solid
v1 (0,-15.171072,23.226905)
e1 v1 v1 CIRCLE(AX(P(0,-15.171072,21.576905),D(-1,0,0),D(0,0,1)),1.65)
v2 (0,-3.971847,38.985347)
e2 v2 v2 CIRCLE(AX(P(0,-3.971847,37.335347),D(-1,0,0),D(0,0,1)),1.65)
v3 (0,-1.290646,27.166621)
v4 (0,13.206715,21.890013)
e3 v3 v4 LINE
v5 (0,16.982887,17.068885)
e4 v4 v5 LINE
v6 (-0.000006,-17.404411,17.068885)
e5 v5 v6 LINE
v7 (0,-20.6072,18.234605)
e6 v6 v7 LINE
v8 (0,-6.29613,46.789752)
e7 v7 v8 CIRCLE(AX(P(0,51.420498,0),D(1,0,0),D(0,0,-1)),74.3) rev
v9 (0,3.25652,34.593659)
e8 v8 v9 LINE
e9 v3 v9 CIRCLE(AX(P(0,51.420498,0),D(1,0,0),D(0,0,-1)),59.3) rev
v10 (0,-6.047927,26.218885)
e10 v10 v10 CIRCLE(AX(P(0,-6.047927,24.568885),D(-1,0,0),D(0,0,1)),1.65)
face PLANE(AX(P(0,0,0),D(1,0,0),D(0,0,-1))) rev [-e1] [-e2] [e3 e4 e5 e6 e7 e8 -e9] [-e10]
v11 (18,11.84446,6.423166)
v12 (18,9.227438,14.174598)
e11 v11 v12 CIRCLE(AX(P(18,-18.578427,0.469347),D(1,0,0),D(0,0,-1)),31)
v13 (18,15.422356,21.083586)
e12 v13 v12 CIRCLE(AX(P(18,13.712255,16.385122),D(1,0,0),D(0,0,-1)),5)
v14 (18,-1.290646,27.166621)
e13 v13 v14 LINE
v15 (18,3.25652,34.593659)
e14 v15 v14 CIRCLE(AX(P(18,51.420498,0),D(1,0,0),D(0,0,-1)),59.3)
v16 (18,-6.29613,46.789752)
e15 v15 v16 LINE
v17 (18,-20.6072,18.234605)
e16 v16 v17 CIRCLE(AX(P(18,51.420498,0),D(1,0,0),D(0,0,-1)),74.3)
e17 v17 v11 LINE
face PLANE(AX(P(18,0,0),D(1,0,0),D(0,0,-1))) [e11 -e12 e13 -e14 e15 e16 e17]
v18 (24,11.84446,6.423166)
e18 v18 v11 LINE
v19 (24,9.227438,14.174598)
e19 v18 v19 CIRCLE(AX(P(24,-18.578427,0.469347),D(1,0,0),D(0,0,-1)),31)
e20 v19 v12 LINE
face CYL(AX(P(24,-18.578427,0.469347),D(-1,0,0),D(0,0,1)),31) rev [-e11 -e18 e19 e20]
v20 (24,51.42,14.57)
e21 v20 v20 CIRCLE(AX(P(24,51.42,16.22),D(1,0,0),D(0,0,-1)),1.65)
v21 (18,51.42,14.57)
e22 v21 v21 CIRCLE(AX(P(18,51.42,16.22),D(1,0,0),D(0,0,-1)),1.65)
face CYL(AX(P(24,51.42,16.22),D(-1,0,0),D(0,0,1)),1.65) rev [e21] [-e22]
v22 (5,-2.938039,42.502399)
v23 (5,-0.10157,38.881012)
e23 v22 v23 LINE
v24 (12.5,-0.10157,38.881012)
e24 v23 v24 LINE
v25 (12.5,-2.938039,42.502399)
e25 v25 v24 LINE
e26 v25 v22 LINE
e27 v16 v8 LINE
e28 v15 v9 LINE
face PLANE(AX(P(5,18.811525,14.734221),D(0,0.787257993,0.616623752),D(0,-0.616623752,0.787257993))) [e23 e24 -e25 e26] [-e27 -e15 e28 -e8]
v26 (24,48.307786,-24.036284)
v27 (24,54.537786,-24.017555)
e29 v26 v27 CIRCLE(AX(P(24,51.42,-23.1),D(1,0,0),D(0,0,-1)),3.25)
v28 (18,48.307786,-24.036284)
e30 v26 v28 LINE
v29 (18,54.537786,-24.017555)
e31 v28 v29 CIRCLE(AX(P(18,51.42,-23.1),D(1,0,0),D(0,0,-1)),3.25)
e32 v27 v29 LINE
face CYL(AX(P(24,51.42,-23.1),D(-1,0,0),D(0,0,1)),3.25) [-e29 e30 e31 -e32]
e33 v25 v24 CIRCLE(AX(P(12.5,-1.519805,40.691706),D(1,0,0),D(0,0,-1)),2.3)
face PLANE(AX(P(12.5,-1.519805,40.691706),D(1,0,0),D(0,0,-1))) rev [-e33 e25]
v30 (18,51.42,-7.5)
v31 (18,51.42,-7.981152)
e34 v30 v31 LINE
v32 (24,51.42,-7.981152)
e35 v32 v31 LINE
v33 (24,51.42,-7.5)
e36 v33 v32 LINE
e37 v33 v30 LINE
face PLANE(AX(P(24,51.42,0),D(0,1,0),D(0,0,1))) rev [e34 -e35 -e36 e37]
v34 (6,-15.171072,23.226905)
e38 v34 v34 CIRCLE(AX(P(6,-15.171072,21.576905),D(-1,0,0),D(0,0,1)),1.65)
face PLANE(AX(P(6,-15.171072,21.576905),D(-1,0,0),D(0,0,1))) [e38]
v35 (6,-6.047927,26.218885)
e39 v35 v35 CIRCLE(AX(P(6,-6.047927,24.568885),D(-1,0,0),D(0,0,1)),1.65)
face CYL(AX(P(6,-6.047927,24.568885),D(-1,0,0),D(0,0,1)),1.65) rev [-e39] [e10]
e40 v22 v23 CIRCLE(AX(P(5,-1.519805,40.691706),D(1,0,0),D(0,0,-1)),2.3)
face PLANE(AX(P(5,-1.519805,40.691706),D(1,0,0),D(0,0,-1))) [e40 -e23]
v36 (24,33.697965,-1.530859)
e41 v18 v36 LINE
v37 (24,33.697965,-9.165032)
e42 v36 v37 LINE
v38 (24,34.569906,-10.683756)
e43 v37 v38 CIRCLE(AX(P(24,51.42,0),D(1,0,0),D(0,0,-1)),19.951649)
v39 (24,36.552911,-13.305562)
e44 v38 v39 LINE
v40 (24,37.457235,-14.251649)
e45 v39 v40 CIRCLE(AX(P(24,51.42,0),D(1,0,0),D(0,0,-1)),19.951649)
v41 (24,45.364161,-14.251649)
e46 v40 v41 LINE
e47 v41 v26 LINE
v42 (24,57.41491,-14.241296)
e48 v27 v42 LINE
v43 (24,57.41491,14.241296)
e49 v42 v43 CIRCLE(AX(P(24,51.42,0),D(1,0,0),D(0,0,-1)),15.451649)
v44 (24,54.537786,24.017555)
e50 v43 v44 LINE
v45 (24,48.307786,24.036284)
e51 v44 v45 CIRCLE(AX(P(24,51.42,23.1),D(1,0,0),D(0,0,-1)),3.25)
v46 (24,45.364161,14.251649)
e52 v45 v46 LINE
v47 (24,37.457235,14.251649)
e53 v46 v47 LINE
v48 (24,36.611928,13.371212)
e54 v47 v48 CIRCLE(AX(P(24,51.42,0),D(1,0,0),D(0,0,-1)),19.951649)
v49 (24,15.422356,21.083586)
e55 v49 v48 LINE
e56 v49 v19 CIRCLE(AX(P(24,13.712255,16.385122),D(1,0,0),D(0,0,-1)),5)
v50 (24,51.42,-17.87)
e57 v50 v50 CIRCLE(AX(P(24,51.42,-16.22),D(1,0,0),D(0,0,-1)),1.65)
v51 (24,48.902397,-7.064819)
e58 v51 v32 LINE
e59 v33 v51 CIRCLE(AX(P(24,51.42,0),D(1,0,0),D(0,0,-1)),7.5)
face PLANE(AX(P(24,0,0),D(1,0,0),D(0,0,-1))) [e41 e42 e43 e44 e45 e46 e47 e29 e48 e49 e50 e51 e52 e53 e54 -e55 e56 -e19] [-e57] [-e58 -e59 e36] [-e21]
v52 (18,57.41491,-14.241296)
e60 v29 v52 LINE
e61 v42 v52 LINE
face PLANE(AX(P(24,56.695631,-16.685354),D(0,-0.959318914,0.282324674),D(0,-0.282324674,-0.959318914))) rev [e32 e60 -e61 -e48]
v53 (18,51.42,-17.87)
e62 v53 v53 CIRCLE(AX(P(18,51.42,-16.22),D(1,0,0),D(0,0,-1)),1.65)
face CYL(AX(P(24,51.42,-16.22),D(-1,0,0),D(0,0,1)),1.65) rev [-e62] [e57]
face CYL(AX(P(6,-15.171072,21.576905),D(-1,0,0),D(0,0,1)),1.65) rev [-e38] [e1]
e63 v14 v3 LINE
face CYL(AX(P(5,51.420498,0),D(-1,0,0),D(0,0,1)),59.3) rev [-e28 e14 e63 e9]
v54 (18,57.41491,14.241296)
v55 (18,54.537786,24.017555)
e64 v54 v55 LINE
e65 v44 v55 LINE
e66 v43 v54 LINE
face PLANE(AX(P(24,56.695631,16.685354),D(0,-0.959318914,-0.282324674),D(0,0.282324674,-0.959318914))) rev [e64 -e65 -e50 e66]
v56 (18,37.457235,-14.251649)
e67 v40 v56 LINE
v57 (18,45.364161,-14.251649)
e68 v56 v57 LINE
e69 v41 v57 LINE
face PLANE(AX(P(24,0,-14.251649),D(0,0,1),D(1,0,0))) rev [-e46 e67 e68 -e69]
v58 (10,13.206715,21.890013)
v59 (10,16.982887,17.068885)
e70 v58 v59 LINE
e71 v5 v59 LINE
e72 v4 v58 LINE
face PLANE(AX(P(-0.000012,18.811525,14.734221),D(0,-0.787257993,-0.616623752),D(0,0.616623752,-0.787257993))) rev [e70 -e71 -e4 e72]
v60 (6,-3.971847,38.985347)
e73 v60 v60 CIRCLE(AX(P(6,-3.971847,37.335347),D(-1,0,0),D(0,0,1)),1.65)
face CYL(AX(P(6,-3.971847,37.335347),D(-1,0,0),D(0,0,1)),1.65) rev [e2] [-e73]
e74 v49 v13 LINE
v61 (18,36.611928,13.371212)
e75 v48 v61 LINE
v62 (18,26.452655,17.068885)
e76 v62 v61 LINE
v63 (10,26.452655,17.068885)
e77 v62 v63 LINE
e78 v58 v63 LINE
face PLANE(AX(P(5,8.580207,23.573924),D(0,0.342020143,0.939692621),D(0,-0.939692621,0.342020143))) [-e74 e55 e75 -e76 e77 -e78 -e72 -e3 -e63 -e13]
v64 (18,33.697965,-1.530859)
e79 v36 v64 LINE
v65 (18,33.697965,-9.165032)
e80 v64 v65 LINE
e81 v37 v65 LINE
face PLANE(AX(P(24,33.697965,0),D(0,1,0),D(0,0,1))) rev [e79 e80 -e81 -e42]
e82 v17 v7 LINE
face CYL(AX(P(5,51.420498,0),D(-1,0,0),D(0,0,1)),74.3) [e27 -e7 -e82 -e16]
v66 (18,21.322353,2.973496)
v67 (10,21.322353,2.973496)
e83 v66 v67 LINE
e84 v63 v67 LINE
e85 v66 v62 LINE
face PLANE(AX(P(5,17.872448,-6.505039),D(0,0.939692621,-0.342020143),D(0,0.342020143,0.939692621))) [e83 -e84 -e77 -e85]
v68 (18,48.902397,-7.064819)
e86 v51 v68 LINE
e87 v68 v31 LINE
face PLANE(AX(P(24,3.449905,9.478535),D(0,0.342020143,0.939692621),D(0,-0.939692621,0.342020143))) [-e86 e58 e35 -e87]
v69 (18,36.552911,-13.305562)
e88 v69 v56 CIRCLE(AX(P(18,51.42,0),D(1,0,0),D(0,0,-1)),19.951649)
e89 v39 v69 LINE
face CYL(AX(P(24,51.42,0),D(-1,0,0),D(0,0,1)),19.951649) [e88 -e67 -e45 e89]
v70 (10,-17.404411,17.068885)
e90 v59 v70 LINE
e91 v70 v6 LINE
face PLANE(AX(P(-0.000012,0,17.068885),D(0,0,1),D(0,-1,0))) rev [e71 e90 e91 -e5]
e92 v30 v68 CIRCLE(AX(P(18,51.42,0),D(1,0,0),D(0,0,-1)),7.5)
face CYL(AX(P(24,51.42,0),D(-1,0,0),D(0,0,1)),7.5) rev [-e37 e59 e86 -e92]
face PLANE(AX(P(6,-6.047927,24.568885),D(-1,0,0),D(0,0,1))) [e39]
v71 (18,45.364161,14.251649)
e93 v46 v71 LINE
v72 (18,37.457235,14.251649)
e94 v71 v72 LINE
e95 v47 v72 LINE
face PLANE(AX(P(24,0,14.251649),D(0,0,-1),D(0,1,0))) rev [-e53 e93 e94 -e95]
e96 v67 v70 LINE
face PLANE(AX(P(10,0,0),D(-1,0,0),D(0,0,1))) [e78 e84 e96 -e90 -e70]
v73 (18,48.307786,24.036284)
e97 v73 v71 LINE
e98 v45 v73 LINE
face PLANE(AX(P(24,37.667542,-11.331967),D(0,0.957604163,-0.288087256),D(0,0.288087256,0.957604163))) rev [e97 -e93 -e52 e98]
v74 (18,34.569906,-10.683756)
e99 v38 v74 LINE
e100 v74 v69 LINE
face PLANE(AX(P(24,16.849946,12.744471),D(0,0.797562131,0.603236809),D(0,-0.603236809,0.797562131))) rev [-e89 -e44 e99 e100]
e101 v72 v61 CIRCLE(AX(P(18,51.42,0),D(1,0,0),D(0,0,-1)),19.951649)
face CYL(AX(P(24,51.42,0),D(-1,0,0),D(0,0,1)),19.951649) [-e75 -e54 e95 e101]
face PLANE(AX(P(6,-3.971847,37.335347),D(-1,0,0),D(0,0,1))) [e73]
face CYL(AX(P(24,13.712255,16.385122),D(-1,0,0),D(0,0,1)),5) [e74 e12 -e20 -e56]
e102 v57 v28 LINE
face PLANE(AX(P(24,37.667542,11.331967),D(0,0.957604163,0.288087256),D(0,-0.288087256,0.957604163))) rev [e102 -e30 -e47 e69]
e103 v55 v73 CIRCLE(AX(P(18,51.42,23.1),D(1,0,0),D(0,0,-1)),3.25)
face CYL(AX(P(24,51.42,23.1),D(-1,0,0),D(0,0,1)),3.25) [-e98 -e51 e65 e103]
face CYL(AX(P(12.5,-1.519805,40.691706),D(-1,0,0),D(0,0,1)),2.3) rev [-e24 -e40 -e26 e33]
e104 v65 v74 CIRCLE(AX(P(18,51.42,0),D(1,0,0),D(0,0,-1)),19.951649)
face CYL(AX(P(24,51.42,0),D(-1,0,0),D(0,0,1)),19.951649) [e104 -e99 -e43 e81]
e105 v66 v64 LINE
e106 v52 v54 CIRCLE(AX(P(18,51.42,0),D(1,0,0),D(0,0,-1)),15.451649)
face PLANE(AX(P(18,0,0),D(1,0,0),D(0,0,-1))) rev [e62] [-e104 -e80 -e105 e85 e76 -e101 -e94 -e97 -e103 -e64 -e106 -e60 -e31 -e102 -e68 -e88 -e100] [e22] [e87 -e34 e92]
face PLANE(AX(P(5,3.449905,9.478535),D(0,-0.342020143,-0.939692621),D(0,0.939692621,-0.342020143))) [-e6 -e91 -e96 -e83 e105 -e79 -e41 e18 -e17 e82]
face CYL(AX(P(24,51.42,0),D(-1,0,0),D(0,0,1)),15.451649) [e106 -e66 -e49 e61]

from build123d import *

# Parameters (mm, degrees)
BOSS_EXTRUDE1_DEPTH     = 5
BOSS_EXTRUDE2_DEPTH     = 13
CUT_EXTRUDE1_START      = -13
SKETCH3_R               = 2.3
CUT_EXTRUDE1_DEPTH      = 7.5
SKETCH4_R               = 1.65
BOSS_EXTRUDE3_DEPTH     = 6
CUT_EXTRUDE2_DEPTH      = 86.071137152
CUT_EXTRUDE2_DEPTH_BACK = 10
SKETCH9_R               = 1.65
CUT_EXTRUDE3_DEPTH      = 6


with BuildPart() as part:
    # Sketch1 → Boss-Extrude1 (new body)
    with BuildSketch(Plane(origin=(0, 0, 0), x_dir=(0, 0, -1), z_dir=(1, 0, 0))):
        with BuildLine():
            Line((-34.593659354, 3.256520294), (-46.7897518, -6.296129983))
            ThreePointArc((-46.7897518, -6.296129983), (-33.290290023, -15.004245976), (-18.234604608, -20.60719958))
            Line((-18.234604608, -20.60719958), (-2.973495544, 21.32235297))
            Line((-2.973495544, 21.32235297), (-17.068884855, 26.45265512))
            Line((-17.068884855, 26.45265512), (-27.166620772, -1.290646299))
            ThreePointArc((-27.166620772, -1.290646299), (-30.963724442, 0.846415848), (-34.593659354, 3.256520294))
        make_face()
    extrude(amount=BOSS_EXTRUDE1_DEPTH)

    # Sketch2 → Boss-Extrude2 (add)
    with BuildSketch(Plane(origin=(5, 0, 0), x_dir=(0, 0, -1), z_dir=(1, 0, 0))):
        with BuildLine():
            Line((-34.593659354, 3.256520294), (-46.7897518, -6.296129983))
            ThreePointArc((-46.7897518, -6.296129983), (-42.613802597, -9.444548196), (-38.226724688, -12.291412509))
            Line((-38.226724688, -12.291412509), (-25.335917908, -2.194623762))
            ThreePointArc((-25.335917908, -2.194623762), (-26.255160174, -1.750514609), (-27.166620772, -1.290646299))
            ThreePointArc((-27.166620772, -1.290646299), (-30.963724442, 0.846415848), (-34.593659354, 3.256520294))
        make_face()
        with BuildLine():
            Line((-25.335917908, -2.194623762), (-38.226724688, -12.291412509))
            ThreePointArc((-38.226724688, -12.291412509), (-28.535215176, -17.181480963), (-18.234604608, -20.60719958))
            Line((-18.234604608, -20.60719958), (-12.16072752, -3.919359432))
            Line((-12.16072752, -3.919359432), (-2.973495544, 21.32235297))
            Line((-2.973495544, 21.32235297), (-17.068884855, 26.45265512))
            Line((-17.068884855, 26.45265512), (-26.256116832, 1.210942718))
            Line((-26.256116832, 1.210942718), (-27.166620772, -1.290646299))
            ThreePointArc((-27.166620772, -1.290646299), (-26.255160174, -1.750514609), (-25.335917908, -2.194623762))
        make_face()
    extrude(amount=BOSS_EXTRUDE2_DEPTH)

    # Sketch3 → Cut-Extrude1 (cut)
    with BuildSketch(Plane(origin=(18, 0, 0), x_dir=(0, 0, -1), z_dir=(1, 0, 0)).offset(CUT_EXTRUDE1_START)):
        with Locations((-40.691705577, -1.519804845)):
            Circle(SKETCH3_R)
    extrude(amount=CUT_EXTRUDE1_DEPTH, mode=Mode.SUBTRACT)

    # Sketch4 → Boss-Extrude3 (add)
    with BuildSketch(Plane(origin=(18, 0, 0), x_dir=(0, 0, -1), z_dir=(1, 0, 0))):
        with BuildLine():
            Line((-13.371212035, 36.611927698), (-21.083585591, 15.422355502))
            ThreePointArc((-21.083585591, 15.422355502), (-19.723042607, 9.989582455), (-14.174598147, 9.227437939))
            ThreePointArc((-14.174598147, 9.227437939), (-10.385594526, 10.792784565), (-6.423166383, 11.844460235))
            Line((-6.423166383, 11.844460235), (1.530859032, 33.697965455))
            Line((1.530859032, 33.697965455), (9.165031814, 33.697965455))
            ThreePointArc((9.165031814, 33.697965455), (9.933965272, 34.117264651), (10.683756157, 34.569905907))
            Line((10.683756157, 34.569905907), (13.30556247, 36.552911383))
            ThreePointArc((13.30556247, 36.552911383), (13.786023096, 36.997313573), (14.25164947, 37.457235089))
            Line((14.25164947, 37.457235089), (14.25164947, 45.3641606))
            Line((14.25164947, 45.3641606), (24.03628358, 48.30778647))
            ThreePointArc((24.03628358, 48.30778647), (26.349985315, 51.429769983), (24.017555191, 54.53778647))
            Line((24.017555191, 54.53778647), (14.241296463, 57.414910041))
            ThreePointArc((14.241296463, 57.414910041), (0, 66.87164947), (-14.241296463, 57.414910041))
            Line((-14.241296463, 57.414910041), (-24.017555191, 54.53778647))
            ThreePointArc((-24.017555191, 54.53778647), (-26.349985315, 51.429769983), (-24.03628358, 48.30778647))
            Line((-24.03628358, 48.30778647), (-14.25164947, 45.3641606))
            Line((-14.25164947, 45.3641606), (-14.25164947, 37.457235089))
            ThreePointArc((-14.25164947, 37.457235089), (-13.817896207, 37.027847242), (-13.371212035, 36.611927698))
        make_face()
        with BuildLine():
            Line((7.5, 51.42), (7.981152097, 51.42))
            Line((7.981152097, 51.42), (7.064819397, 48.902396598))
            ThreePointArc((7.064819397, 48.902396598), (-7.390404098, 52.697469085), (7.5, 51.42))
        make_face(mode=Mode.SUBTRACT)
        with Locations((16.22, 51.42)):
            Circle(SKETCH4_R, mode=Mode.SUBTRACT)
        with Locations((-16.22, 51.42)):
            Circle(SKETCH4_R, mode=Mode.SUBTRACT)
    extrude(amount=BOSS_EXTRUDE3_DEPTH)

    # Sketch8 → Cut-Extrude2 (cut, two sides: drawn at the far end of the back side and taken through both)
    with BuildSketch(Plane.ZY.offset(-CUT_EXTRUDE2_DEPTH_BACK)):
        Polygon((17.068884855, -17.404410883), (17.068884855, 16.982887384), (8.814387371, 23.448263736), (2.973495544, 21.32235297), align=None)
        Polygon((8.814387371, 23.448263736), (17.068884855, 16.982887384), (17.068884855, 26.45265512), align=None)
        Polygon((17.068884855, 16.982887384), (21.890012849, 13.206714822), (17.068884855, 26.45265512), align=None)
    extrude(amount=CUT_EXTRUDE2_DEPTH + CUT_EXTRUDE2_DEPTH_BACK, mode=Mode.SUBTRACT)

    # Sketch9 → Cut-Extrude3 (cut)
    with BuildSketch(Plane.ZY):
        with Locations((24.568884855, -6.047927384)):
            Circle(SKETCH9_R)
        with Locations((37.335347169, -3.97184687)):
            Circle(SKETCH9_R)
        with Locations((21.576904852, -15.17107203)):
            Circle(SKETCH9_R)
    extrude(amount=-CUT_EXTRUDE3_DEPTH, mode=Mode.SUBTRACT)


solid = part.part
